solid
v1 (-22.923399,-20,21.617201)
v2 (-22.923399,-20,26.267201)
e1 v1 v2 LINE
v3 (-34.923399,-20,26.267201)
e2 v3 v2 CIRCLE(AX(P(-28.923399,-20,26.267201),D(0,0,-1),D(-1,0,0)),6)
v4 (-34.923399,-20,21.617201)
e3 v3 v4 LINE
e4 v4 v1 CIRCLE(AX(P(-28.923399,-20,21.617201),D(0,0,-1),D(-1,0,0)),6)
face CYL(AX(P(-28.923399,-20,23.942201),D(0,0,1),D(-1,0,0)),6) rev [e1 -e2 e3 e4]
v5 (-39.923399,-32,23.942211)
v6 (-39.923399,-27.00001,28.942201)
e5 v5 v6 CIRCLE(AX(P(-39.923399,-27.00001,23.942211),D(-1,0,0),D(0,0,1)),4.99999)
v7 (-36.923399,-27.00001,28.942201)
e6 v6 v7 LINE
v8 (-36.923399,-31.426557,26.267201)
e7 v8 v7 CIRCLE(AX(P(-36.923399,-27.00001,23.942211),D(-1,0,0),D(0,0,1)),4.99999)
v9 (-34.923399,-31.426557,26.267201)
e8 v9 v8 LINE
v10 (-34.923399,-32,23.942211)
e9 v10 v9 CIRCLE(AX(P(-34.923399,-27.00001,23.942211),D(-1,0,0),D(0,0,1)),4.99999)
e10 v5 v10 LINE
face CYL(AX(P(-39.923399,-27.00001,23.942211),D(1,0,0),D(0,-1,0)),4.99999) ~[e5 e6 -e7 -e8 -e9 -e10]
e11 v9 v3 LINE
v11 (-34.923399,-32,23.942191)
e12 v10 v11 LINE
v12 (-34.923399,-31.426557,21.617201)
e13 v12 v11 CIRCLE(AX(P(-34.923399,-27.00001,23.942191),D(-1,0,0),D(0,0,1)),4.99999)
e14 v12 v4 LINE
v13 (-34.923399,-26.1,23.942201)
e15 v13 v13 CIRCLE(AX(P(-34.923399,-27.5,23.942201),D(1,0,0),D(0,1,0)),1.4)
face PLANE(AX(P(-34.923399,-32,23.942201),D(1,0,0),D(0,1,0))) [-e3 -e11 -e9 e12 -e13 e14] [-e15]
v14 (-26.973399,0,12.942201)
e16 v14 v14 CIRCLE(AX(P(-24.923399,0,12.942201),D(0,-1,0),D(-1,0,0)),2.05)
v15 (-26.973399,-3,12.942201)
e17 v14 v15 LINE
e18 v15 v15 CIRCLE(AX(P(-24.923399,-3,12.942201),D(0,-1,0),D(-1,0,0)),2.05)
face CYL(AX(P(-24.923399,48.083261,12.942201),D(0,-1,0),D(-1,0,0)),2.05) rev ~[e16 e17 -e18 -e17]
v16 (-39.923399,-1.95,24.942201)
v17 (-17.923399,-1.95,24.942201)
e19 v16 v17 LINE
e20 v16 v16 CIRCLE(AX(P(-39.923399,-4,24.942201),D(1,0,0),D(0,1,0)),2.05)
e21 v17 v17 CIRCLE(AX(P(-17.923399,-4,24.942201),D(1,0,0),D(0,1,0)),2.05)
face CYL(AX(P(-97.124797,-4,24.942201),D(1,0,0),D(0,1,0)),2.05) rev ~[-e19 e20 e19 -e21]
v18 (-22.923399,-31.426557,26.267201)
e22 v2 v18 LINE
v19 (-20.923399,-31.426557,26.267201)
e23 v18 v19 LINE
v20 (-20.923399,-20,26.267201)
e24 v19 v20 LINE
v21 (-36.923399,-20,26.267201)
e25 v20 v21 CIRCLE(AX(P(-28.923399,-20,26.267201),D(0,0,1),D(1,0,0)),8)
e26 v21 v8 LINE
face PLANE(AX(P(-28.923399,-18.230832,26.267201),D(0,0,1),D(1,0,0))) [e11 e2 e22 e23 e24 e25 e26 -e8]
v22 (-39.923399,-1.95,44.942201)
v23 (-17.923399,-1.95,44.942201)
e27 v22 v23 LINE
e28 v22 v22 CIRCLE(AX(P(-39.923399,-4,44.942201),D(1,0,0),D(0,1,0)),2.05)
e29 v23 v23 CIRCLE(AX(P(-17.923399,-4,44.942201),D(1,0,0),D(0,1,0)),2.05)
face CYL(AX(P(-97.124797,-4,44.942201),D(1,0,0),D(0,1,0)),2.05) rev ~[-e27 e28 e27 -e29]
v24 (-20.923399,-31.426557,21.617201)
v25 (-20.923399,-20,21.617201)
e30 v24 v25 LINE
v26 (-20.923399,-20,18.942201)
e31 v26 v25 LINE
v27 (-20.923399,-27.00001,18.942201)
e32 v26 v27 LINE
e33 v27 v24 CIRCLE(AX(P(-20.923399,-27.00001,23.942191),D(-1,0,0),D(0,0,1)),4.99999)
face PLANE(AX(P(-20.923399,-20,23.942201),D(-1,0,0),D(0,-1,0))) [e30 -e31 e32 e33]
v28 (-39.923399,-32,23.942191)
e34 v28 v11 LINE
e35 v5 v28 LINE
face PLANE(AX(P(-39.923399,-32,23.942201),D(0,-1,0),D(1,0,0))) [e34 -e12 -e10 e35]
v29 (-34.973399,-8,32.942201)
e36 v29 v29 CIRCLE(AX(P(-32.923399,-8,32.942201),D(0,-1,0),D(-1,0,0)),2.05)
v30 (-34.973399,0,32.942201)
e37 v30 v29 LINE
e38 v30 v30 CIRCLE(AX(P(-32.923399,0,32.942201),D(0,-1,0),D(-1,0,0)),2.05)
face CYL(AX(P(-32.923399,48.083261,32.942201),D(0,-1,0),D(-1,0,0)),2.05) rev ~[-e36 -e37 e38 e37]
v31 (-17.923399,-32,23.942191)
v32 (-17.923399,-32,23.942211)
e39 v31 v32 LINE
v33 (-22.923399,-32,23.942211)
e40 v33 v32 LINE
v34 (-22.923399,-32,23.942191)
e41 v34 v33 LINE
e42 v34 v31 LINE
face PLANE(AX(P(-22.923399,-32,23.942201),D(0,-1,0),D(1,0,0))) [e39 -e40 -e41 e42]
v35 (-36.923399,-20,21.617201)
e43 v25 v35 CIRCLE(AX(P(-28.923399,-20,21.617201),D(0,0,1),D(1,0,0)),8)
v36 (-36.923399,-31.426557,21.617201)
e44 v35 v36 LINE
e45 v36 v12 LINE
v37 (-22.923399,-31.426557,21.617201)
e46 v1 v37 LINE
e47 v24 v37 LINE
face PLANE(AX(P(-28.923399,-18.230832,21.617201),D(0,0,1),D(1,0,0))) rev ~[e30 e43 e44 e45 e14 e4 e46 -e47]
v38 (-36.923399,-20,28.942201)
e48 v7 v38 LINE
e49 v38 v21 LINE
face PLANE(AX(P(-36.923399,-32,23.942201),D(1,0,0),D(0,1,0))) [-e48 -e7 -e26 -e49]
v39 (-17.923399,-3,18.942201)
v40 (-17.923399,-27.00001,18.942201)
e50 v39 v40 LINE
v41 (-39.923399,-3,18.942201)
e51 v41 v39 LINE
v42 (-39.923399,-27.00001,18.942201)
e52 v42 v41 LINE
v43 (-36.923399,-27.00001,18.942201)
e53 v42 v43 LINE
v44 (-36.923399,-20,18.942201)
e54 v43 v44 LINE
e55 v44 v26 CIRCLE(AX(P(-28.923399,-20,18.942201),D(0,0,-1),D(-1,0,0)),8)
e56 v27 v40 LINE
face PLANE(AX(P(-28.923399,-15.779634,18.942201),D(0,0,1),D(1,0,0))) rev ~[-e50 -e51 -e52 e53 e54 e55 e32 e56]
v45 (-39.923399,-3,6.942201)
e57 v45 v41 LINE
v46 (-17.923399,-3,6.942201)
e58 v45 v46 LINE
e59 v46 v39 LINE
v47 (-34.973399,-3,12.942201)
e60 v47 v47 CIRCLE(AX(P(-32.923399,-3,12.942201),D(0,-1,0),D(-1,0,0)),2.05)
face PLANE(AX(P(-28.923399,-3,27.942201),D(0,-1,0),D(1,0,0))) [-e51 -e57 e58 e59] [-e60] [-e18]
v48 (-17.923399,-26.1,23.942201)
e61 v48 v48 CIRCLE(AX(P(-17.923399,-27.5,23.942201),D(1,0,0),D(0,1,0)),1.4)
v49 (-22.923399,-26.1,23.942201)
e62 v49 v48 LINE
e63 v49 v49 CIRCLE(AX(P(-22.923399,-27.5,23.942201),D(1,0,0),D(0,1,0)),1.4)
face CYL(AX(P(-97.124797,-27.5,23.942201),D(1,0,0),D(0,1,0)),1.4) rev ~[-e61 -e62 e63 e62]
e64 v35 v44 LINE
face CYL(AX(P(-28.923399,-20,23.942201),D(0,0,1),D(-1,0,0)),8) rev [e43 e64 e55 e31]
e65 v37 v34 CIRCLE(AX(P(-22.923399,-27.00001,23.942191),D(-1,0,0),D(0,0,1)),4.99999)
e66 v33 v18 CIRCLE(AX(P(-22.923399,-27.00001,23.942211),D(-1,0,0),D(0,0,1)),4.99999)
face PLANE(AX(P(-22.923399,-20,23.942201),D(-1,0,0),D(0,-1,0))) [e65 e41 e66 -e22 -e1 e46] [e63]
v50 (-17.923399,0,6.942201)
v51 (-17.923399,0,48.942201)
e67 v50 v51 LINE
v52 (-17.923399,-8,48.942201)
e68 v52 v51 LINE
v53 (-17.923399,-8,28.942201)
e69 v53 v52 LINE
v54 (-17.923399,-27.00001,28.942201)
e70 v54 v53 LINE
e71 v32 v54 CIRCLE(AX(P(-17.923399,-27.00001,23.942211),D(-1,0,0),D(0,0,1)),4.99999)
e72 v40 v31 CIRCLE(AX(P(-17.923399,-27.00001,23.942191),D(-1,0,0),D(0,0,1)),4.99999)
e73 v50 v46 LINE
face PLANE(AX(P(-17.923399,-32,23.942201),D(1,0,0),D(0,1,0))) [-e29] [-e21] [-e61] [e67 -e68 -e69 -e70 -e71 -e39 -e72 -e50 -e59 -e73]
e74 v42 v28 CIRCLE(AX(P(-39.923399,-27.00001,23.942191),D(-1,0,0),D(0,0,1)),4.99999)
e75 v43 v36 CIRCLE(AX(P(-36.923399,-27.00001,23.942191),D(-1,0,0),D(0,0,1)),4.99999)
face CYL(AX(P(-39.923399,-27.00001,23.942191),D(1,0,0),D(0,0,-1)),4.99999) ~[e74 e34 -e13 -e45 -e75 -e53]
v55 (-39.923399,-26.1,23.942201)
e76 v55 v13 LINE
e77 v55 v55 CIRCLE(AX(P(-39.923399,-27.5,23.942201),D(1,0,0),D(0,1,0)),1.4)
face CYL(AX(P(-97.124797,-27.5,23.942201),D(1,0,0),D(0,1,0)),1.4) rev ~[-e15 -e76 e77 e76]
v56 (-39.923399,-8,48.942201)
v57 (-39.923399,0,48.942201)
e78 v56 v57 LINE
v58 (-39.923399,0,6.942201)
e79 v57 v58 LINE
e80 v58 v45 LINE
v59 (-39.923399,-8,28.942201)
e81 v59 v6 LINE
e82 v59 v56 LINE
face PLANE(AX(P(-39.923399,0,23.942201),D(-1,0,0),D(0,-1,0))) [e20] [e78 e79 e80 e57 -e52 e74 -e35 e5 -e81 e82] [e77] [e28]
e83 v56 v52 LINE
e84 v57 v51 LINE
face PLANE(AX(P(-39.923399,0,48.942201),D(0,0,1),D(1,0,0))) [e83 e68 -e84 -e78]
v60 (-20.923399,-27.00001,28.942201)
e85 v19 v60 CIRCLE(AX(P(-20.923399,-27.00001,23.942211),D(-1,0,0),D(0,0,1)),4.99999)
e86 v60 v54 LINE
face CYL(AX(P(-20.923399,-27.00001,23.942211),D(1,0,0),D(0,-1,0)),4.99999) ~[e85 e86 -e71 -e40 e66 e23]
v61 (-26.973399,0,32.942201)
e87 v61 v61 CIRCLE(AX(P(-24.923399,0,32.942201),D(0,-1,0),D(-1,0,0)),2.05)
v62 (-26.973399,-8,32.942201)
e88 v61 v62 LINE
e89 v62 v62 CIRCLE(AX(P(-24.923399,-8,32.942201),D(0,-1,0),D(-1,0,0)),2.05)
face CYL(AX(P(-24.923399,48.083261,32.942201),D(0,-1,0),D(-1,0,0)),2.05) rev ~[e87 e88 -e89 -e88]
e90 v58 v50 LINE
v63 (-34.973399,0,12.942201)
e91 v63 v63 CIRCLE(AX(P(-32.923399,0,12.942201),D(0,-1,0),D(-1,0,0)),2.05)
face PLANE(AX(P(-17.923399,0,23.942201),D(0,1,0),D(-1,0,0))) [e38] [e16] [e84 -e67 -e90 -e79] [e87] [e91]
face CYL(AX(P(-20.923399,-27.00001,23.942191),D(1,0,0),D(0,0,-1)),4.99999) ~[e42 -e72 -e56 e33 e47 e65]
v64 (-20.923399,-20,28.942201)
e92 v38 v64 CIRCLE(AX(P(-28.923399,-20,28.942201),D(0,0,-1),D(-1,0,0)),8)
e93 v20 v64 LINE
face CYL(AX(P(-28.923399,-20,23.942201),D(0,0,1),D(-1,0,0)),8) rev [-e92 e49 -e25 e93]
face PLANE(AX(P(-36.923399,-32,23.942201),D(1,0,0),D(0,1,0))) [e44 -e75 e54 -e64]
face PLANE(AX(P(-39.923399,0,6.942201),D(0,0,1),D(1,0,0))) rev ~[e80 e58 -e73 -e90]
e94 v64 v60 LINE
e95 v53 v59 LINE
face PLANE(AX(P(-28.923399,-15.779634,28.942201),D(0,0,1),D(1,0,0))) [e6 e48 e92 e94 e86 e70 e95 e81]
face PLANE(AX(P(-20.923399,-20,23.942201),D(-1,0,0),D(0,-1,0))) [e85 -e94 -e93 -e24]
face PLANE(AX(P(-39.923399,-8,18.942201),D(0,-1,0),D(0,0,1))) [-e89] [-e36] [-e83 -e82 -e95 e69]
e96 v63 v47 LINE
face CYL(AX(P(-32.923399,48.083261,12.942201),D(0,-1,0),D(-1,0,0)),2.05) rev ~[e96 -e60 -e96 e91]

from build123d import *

# Parameters (mm, degrees)
F0_W     = 22
F0_H     = 42
F1_DEPTH = 3
F2_W     = 3
F2_H     = 30
F2_W_2   = 5
F3_DEPTH = 22
F4_D     = 4.1
F7_DEPTH = 5
F8_DEPTH = 2.325
F9_R     = 4.99999
F11_D    = 4.1
F12_D    = 2.8


# Not quite as in the source:
# - a fillet or chamfer is up to 0.001 mm smaller than in the source, because OpenCascade refuses the exact size


with BuildPart() as f1:
    # F0 (on Front) → F1 (new body)
    with BuildSketch(Plane.XZ):
        with Locations((-28.9233987555, 27.9422005266)):
            Rectangle(F0_W, F0_H)
    extrude(amount=F1_DEPTH)

    # F2 (on face) → F3 (join)
    with BuildSketch(Plane(origin=(-39.9233987555, 0, 0), x_dir=(0, -1, 0), z_dir=(-1, 0, 0))):
        with Locations((1.5, 33.9422005266)):
            Rectangle(F2_W, F2_H)
        with Locations((5.5, 33.9422005266)):
            Rectangle(F2_W_2, F2_H)
    extrude(amount=-F3_DEPTH)

    # F4 (through all)
    with Locations(Plane(origin=(0, 0, 0), x_dir=(1, 0, 0), z_dir=(0, 1, 0))):
        with Locations((-24.9233987555, -12.9422005266), (-32.9233987555, -12.9422005266), (-32.9233987555, -32.9422005266), (-24.9233987555, -32.9422005266)):
            Hole(F4_D / 2)

    # F6 (on line) → F7 (join, symmetric)
    with BuildSketch(Plane.XY.offset(23.9422005266)):
        with BuildLine():
            ThreePointArc((-36.9233987555, -20), (-28.9233987555, -12), (-20.9233987555, -20))
            Line((-20.9233987555, -20), (-20.9233987555, -32))
            Line((-20.9233987555, -32), (-17.9233987555, -32))
            Line((-17.9233987555, -32), (-17.9233987555, 0))
            Line((-17.9233987555, 0), (-39.9233987555, 0))
            Line((-39.9233987555, 0), (-39.9233987555, -32))
            Line((-39.9233987555, -32), (-36.9233987555, -32))
            Line((-36.9233987555, -32), (-36.9233987555, -20))
        make_face()
    extrude(amount=F7_DEPTH, both=True)

    # F6 (on line) → F8 (join, symmetric)
    with BuildSketch(Plane.XY.offset(23.9422005266)):
        with BuildLine():
            ThreePointArc((-34.9233987555, -20), (-28.9233987555, -14), (-22.9233987555, -20))
            Line((-22.9233987555, -20), (-22.9233987555, -25.2915026221))
            ThreePointArc((-22.9233987555, -25.2915026221), (-21.4400839819, -22.8284271247), (-20.9233987555, -20))
            ThreePointArc((-20.9233987555, -20), (-28.9233987555, -12), (-36.9233987555, -20))
            ThreePointArc((-36.9233987555, -20), (-36.406713529, -22.8284271247), (-34.9233987555, -25.2915026221))
            Line((-34.9233987555, -25.2915026221), (-34.9233987555, -20))
        make_face()
        with BuildLine():
            Line((-34.9233987555, -32), (-34.9233987555, -25.2915026221))
            ThreePointArc((-34.9233987555, -25.2915026221), (-36.406713529, -22.8284271247), (-36.9233987555, -20))
            Line((-36.9233987555, -20), (-36.9233987555, -32))
            Line((-36.9233987555, -32), (-34.9233987555, -32))
        make_face()
        with BuildLine():
            ThreePointArc((-20.9233987555, -20), (-21.4400839819, -22.8284271247), (-22.9233987555, -25.2915026221))
            Line((-22.9233987555, -25.2915026221), (-22.9233987555, -32))
            Line((-22.9233987555, -32), (-20.9233987555, -32))
            Line((-20.9233987555, -32), (-20.9233987555, -20))
        make_face()
    extrude(amount=F8_DEPTH, both=True)

    # F9 (radius 5 in the source; OpenCascade refuses exactly that, so slightly less here)
    f9_edges = [f1.edges().sort_by_distance(p)[0] for p in [
        (-38.423399, -32, 28.942201),
        (-38.423399, -32, 18.942201),
        (-19.423399, -32, 18.942201),
        (-19.423399, -32, 28.942201),
    ]]
    fillet(f9_edges, radius=F9_R)

    # F11 (through all)
    with Locations(Plane(origin=(-39.9233987555, 0, 0), x_dir=(0, -1, 0), z_dir=(-1, 0, 0))):
        with Locations((4, 44.9422005266), (4, 24.9422005266)):
            Hole(F11_D / 2)

    # F12 (through all)
    with Locations(Plane(origin=(-39.9233987555, 0, 0), x_dir=(0, -1, 0), z_dir=(-1, 0, 0))):
        with Locations((27.5, 23.9422005266)):
            Hole(F12_D / 2)


solid = f1.part
